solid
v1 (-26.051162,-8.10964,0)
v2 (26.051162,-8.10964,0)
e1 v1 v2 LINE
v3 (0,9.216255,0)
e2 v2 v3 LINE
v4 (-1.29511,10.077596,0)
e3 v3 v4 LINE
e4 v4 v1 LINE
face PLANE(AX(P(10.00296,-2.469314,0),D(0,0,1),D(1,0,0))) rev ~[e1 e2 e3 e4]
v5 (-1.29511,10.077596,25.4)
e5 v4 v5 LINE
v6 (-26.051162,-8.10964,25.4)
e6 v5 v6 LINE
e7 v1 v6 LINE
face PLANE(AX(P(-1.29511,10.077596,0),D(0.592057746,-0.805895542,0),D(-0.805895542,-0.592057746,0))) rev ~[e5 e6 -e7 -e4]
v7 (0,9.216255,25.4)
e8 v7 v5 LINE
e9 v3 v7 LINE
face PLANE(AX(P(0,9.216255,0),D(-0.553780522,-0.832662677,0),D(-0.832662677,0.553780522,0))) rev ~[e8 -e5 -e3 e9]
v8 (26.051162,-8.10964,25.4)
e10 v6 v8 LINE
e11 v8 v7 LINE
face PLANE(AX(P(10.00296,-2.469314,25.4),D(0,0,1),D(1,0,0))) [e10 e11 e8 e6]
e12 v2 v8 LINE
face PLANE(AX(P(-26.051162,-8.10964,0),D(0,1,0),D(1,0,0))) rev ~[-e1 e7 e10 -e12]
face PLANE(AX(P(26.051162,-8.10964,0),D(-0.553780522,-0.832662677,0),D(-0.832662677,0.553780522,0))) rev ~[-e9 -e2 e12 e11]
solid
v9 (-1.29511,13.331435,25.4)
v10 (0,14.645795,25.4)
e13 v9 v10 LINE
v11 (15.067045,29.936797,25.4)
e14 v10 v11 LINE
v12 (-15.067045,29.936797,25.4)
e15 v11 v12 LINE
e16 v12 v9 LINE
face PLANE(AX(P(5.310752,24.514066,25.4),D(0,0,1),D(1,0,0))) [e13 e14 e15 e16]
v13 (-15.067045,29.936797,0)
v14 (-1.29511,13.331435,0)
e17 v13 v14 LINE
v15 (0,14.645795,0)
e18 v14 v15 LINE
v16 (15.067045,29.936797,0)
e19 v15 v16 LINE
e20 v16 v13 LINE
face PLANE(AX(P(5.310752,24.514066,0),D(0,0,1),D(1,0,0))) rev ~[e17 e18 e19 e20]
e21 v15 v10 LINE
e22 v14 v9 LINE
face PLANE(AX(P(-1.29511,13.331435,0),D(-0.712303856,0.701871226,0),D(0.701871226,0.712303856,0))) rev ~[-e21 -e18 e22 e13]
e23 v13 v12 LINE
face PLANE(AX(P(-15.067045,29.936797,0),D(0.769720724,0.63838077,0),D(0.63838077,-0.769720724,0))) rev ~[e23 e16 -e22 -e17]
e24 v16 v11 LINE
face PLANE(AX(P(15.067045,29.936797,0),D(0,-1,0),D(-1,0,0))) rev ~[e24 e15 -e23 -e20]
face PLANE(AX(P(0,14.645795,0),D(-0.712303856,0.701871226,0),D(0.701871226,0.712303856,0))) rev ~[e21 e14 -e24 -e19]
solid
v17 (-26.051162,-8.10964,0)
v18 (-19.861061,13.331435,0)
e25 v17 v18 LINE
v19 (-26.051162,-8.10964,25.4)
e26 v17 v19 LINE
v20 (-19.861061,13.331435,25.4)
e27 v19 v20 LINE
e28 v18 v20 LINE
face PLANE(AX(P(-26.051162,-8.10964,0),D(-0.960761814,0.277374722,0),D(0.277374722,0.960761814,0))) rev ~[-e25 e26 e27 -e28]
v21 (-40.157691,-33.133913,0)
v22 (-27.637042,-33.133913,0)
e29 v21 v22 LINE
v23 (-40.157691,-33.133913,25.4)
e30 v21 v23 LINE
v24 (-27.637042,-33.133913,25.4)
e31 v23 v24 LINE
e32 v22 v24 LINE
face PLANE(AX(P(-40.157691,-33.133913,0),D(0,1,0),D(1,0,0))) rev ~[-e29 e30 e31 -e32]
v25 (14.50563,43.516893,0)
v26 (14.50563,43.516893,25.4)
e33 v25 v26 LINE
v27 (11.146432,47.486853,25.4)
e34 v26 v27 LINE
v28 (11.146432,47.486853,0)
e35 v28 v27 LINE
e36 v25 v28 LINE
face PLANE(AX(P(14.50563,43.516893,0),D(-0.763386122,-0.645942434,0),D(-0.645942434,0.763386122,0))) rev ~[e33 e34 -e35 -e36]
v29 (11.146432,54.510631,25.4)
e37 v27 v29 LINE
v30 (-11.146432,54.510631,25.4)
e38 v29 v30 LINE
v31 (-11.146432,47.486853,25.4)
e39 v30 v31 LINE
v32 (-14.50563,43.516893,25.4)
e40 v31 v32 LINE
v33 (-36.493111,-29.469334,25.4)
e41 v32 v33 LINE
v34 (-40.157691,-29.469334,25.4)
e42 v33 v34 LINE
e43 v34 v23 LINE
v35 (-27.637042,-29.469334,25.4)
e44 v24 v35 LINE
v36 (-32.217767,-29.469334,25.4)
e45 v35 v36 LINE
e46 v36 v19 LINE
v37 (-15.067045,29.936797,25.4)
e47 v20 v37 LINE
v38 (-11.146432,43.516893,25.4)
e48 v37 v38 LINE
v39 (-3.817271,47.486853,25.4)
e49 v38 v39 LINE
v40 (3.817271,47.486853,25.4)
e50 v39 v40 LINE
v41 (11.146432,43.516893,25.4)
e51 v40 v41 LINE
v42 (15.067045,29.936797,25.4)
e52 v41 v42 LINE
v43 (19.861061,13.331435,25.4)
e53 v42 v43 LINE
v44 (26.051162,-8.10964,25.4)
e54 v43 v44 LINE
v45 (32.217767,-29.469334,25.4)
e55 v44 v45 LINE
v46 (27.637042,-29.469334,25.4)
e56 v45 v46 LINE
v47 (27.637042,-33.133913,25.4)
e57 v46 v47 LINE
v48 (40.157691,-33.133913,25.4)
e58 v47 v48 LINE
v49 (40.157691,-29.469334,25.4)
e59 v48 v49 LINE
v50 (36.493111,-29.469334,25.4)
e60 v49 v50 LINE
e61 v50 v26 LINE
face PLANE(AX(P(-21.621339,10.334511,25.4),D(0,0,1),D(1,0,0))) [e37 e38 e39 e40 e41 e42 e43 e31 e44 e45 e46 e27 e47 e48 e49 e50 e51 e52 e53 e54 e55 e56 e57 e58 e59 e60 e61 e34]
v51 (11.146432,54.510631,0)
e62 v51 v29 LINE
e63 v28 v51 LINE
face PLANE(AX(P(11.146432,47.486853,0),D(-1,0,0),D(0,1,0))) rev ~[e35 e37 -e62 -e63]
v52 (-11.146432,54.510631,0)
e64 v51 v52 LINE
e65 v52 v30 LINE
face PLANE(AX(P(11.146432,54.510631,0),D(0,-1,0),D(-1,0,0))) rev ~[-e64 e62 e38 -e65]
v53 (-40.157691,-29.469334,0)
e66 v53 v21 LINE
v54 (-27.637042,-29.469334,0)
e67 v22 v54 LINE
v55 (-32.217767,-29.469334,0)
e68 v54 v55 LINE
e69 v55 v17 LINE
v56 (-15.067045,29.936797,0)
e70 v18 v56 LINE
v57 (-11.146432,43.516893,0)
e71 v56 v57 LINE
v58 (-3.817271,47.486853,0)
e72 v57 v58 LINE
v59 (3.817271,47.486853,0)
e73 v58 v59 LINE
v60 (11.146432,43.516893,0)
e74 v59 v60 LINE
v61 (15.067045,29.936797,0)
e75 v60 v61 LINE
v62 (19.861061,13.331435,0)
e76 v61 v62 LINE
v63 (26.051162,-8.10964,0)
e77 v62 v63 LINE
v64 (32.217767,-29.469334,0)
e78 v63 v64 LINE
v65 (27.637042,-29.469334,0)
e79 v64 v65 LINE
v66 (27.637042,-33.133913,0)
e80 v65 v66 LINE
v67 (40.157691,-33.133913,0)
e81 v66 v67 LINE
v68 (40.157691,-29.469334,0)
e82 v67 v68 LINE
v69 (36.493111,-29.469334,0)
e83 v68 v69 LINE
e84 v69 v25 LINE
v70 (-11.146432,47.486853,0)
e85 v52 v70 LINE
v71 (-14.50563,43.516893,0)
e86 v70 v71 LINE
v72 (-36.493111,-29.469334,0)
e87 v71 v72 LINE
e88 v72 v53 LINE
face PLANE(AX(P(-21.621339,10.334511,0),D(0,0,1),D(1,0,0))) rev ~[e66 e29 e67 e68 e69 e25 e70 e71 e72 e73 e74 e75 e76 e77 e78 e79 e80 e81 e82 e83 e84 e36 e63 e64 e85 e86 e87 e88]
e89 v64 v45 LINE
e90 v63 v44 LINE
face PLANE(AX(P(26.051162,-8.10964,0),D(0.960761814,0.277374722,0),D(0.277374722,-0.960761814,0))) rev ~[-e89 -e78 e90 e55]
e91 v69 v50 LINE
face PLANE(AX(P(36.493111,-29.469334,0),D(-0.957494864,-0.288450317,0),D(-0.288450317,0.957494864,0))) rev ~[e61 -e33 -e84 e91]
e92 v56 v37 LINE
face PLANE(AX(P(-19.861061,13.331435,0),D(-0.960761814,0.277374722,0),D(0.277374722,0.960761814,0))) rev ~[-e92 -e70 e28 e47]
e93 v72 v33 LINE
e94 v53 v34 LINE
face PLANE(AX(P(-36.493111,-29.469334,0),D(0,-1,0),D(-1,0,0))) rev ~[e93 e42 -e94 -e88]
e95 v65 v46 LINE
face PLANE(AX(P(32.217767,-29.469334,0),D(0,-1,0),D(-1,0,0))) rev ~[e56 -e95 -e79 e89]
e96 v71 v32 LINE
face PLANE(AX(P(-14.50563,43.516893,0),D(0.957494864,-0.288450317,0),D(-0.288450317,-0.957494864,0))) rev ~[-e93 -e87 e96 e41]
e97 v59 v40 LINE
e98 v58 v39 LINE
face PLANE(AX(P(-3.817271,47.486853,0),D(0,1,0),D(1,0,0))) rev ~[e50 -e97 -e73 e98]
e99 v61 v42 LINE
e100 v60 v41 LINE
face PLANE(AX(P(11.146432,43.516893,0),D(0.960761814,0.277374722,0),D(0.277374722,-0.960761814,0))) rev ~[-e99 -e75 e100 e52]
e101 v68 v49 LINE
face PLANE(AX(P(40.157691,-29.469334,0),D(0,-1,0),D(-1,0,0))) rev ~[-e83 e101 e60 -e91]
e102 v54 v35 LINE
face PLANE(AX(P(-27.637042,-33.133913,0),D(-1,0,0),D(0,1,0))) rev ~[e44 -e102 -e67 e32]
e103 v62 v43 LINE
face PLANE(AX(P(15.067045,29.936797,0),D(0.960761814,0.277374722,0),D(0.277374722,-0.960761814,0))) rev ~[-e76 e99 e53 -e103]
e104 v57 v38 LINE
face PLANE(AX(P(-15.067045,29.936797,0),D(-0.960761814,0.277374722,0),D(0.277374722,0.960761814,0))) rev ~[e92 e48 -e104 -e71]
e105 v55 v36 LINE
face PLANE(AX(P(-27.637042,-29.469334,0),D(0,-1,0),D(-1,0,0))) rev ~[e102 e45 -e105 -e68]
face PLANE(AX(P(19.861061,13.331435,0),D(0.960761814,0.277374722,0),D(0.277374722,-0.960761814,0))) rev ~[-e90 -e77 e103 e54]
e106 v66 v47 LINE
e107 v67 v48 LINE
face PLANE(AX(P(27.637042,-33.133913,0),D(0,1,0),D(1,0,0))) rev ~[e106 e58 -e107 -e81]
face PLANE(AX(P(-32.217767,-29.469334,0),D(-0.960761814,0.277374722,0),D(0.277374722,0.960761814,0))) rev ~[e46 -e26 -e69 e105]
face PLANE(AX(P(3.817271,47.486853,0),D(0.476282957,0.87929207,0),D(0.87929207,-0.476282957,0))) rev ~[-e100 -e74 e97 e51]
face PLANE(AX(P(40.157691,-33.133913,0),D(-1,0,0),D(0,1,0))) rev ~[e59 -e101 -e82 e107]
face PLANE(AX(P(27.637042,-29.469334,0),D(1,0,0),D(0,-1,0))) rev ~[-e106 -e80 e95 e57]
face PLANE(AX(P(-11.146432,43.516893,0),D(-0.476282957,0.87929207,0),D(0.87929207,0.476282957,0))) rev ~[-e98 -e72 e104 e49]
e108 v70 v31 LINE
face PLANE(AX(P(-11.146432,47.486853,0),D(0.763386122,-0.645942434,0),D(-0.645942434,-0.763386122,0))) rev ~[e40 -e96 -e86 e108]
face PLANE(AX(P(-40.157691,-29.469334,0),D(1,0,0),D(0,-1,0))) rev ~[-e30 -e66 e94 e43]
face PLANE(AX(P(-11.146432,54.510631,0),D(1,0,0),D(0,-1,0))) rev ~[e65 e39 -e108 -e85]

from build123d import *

# Parameters (mm, degrees)
F1_DEPTH = 25.4


with BuildPart() as f1:
    # F0 (on Top) → F1 (new body)
    with BuildSketch(Plane.XY):
        Polygon((-11.1464317888, 47.4868528545), (-14.5056303591, 43.5168929398), (-36.4931114018, -29.4693335891), (-40.1576906443, -29.4693335891), (-40.1576906443, -33.1339128315), (-27.6370421052, -33.1339128315), (-27.6370421052, -29.4693335891), (-32.2177670896, -29.4693335891), (-26.0511616172, -8.1096400765), (-19.8610611523, 13.3314346496), (-15.0670449303, 29.9367968142), (-11.1464317888, 43.5168929398), (-3.8172712084, 47.4868528545), (0, 47.4868528545), (0, 54.5106306672), (-7.4818514986, 54.5106306672), (-11.1464317888, 54.5106306672), align=None)
        Polygon((8.3979964256, 54.5106306672), (0, 54.5106306672), (0, 47.4868528545), (3.8172712084, 47.4868528545), (11.1464317888, 43.5168929398), (15.0670449303, 29.9367968142), (19.8610611523, 13.3314346496), (26.0511616172, -8.1096400765), (32.2177670896, -29.4693335891), (27.6370421052, -29.4693335891), (27.6370421052, -33.1339128315), (40.1576906443, -33.1339128315), (40.1576906443, -29.4693335891), (36.4931114018, -29.4693335891), (14.5056303591, 43.5168929398), (11.1464317888, 47.4868528545), (11.1464317888, 54.5106306672), align=None)
    extrude(amount=F1_DEPTH)


with BuildPart() as f1b:
    # F0 (on Top) → F1, piece 2 (new body)
    with BuildSketch(Plane.XY):
        Polygon((15.0670449303, 29.9367968142), (0, 29.9367968142), (0, 14.6457949804), align=None)
        Polygon((0, 14.6457949804), (0, 29.9367968142), (-15.0670449303, 29.9367968142), (-1.295109789, 13.3314346496), align=None)
    extrude(amount=F1_DEPTH)


with BuildPart() as f1c:
    # F0 (on Top) → F1, piece 3 (new body)
    with BuildSketch(Plane.XY):
        Polygon((0, 9.216254625), (0, -8.1096400765), (26.0511616172, -8.1096400765), align=None)
        Polygon((-1.295109789, 10.0775957108), (-26.0511616172, -8.1096400765), (0, -8.1096400765), (0, 9.216254625), align=None)
    extrude(amount=F1_DEPTH)


solid = Compound([f1.part, f1b.part, f1c.part])
